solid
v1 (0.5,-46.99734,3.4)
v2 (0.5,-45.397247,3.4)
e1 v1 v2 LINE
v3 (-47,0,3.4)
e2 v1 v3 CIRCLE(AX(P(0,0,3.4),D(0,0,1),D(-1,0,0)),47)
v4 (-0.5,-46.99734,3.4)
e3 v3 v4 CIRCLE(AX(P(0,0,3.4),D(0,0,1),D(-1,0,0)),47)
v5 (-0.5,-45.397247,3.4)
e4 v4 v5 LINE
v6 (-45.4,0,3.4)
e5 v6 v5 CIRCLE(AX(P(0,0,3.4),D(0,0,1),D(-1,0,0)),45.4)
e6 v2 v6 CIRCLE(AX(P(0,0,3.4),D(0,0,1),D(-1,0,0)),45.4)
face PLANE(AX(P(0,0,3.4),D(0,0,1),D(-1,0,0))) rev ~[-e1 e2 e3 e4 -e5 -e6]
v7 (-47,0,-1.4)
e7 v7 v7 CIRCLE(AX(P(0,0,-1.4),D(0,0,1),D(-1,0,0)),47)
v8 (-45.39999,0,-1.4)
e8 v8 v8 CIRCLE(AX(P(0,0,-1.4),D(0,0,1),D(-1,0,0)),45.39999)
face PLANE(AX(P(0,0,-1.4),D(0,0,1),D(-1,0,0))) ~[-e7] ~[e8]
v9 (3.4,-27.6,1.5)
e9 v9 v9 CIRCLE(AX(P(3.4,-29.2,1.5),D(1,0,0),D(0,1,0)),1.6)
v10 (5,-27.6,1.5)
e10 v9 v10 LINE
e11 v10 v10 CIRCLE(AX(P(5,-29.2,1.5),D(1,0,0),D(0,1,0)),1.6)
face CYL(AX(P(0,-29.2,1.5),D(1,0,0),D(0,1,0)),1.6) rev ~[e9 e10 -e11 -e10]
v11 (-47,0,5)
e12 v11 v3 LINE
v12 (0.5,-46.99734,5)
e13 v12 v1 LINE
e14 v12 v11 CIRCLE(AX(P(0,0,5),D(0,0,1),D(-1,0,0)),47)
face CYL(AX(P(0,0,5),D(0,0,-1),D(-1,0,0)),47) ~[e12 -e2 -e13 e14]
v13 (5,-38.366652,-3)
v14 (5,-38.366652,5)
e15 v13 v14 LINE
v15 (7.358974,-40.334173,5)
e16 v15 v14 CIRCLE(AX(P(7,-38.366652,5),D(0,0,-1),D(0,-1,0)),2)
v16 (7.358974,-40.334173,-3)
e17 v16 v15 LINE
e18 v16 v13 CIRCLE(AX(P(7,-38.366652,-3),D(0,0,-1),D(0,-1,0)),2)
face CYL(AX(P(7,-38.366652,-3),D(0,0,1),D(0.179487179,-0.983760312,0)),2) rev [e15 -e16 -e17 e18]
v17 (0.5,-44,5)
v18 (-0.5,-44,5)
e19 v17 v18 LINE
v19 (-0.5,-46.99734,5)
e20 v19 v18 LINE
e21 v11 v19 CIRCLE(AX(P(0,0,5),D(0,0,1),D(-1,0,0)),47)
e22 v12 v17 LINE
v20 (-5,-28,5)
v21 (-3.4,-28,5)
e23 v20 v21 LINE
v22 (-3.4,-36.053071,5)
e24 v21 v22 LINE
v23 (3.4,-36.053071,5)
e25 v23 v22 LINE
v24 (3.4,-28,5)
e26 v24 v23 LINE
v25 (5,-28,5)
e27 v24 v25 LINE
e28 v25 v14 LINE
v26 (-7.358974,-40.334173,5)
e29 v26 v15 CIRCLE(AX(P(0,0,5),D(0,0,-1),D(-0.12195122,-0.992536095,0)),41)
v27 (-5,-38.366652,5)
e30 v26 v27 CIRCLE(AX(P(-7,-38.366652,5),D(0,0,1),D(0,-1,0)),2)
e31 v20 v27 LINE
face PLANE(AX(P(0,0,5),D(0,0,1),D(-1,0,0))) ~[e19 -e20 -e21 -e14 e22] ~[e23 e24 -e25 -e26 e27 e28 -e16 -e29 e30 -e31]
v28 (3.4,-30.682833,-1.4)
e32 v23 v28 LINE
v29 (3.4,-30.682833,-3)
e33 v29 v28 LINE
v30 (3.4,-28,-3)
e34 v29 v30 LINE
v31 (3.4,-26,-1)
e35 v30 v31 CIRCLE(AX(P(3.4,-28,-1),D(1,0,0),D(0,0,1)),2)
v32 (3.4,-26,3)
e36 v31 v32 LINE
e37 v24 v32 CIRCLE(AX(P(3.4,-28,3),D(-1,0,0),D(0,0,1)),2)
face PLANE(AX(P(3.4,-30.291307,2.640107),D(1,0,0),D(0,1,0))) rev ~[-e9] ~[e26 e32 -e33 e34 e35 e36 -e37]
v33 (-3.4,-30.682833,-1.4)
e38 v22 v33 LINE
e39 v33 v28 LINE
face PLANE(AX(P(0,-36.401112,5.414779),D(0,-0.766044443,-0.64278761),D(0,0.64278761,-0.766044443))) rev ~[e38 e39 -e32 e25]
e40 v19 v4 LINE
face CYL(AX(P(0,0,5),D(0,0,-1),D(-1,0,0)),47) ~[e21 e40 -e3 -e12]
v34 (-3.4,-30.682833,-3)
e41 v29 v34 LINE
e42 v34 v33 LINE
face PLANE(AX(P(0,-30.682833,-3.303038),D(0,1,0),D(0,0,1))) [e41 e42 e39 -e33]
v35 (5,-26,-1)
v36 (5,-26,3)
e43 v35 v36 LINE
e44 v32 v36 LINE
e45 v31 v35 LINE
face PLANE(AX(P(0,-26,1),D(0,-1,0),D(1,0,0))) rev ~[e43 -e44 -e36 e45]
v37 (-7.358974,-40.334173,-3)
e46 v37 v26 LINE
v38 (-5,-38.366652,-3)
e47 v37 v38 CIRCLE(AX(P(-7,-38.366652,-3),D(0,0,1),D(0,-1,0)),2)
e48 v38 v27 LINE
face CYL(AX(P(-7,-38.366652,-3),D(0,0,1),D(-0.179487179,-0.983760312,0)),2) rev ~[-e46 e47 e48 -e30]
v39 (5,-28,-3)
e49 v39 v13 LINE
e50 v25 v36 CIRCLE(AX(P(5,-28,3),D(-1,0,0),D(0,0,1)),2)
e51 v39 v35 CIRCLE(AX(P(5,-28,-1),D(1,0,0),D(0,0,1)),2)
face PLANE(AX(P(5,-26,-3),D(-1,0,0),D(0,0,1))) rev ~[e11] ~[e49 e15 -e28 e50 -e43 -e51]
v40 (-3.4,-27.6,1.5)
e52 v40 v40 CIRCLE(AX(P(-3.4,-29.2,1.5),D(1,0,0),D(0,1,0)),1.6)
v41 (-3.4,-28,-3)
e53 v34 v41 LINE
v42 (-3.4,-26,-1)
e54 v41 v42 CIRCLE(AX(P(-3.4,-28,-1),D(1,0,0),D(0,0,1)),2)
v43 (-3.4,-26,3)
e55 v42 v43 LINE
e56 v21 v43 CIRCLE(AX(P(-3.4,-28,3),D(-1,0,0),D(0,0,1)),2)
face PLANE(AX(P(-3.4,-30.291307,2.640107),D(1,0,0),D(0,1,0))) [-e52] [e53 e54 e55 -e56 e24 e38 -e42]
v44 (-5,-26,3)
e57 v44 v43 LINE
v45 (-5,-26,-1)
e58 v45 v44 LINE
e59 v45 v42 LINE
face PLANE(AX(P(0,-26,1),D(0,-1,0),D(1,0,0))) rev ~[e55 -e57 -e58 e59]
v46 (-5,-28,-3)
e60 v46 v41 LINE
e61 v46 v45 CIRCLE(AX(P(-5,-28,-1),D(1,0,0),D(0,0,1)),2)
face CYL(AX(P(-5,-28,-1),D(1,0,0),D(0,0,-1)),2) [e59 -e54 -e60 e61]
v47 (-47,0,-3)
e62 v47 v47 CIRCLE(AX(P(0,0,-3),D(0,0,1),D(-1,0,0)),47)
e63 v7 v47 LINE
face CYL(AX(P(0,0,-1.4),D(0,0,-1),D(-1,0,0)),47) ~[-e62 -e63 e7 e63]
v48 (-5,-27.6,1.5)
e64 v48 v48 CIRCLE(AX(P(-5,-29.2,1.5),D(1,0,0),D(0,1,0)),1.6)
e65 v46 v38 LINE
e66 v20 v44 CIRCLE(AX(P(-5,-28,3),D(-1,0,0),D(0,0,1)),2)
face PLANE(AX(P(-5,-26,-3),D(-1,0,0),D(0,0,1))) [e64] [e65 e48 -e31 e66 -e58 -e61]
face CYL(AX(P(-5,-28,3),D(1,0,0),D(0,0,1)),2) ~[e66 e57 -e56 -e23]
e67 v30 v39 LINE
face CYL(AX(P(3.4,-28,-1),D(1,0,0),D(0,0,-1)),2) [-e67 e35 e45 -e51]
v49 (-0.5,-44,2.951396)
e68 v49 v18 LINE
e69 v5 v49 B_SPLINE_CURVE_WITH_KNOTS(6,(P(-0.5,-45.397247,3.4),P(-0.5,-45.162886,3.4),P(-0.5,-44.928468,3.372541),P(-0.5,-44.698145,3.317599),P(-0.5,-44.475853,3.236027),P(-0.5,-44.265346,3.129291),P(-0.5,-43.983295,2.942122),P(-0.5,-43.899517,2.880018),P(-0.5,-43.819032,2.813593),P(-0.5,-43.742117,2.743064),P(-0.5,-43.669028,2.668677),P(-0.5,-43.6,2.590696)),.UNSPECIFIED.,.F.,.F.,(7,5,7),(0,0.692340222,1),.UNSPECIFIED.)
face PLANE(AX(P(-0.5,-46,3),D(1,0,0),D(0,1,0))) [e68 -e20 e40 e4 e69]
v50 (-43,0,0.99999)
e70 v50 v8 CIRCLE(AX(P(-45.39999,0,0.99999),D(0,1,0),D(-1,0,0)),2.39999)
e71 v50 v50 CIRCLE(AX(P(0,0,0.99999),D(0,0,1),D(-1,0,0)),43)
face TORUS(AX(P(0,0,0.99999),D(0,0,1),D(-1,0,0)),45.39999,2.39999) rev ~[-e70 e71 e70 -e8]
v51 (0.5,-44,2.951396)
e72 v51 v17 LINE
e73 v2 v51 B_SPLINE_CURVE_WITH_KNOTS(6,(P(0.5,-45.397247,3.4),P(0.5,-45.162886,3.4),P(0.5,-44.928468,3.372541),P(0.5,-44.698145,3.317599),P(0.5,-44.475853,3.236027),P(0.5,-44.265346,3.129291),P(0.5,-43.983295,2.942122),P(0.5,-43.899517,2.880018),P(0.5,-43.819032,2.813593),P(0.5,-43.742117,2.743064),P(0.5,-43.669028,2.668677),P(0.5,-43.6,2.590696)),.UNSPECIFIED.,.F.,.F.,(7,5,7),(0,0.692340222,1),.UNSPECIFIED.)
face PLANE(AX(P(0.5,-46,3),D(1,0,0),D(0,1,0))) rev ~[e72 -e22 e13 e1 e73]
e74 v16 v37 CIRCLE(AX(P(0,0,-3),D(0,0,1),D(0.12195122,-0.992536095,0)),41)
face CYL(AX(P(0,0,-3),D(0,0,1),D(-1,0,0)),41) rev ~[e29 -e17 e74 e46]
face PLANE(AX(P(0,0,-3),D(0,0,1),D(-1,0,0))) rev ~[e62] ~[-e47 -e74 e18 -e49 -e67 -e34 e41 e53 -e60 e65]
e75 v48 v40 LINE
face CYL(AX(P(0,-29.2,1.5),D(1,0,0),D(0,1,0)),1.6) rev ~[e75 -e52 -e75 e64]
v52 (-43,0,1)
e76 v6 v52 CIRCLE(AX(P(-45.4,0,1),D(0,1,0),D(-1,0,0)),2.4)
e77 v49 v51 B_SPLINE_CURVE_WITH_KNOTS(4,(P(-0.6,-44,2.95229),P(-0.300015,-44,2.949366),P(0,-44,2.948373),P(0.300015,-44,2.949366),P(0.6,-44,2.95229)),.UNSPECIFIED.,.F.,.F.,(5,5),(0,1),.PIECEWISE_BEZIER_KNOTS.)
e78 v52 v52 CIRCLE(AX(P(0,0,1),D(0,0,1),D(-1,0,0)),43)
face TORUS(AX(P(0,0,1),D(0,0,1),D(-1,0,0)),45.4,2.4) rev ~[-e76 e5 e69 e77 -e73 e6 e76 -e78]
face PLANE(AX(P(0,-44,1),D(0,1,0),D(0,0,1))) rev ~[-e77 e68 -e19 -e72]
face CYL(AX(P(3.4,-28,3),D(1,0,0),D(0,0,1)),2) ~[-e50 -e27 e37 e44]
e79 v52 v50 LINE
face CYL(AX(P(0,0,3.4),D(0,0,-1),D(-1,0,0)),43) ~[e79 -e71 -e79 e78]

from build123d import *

# Parameters (mm, degrees)
F2_R      = 2.4
F3_R      = 2.39999
F5_W      = 10
F5_H      = 8
F7_R      = 1.6
F8_DEPTH  = 5
F7_W      = 4.6828329376
F7_H      = 1.903038422
F9_DEPTH  = 3.4
F10_R     = 2
F11_W     = 4
F11_H     = 4
F12_DEPTH = 0.5


# Not quite as in the source:
# - a fillet or chamfer is up to 0.001 mm smaller than in the source, because OpenCascade refuses the exact size
# - a feature names something its author has since deleted; it is built from what else it names


with BuildPart() as f1:
    # F0 (on Front) → F1 (revolve)
    with BuildSketch(Plane.XZ):
        Polygon((-41, 5), (-47, 5), (-47, 3.4), (-43, 3.4), (-43, -1.4), (-47, -1.4), (-47, -3), (-41, -3), align=None)
    revolve(axis=Axis((0, 0, 0.7178727537), (0, 0, 1)))

    # F2
    f2_edges = [f1.edges().sort_by_distance(p)[0] for p in [
        (43, 0, 3.4),
    ]]
    fillet(f2_edges, radius=F2_R)

    # F3 (radius 2.4 in the source; OpenCascade refuses exactly that, so slightly less here)
    f3_edges = [f1.edges().sort_by_distance(p)[0] for p in [
        (43, 0, -1.4),
    ]]
    fillet(f3_edges, radius=F3_R)

    # F5 (on offset) → F6 (join, up to the next surface of F1)
    with BuildSketch(Plane.XZ.offset(26)):
        with Locations((0, 1)):
            Rectangle(F5_W, F5_H)
    extrude(until=Until.NEXT)

    # F7 (on Right) → F8 (cut, symmetric)
    with BuildSketch(Plane.YZ):
        with Locations((-29.2, 1.5)):
            Circle(F7_R)
    extrude(amount=F8_DEPTH, both=True, mode=Mode.SUBTRACT)

    # F7 (on Right) → F9 (cut, symmetric)
    with BuildSketch(Plane.YZ):
        Polygon((-26, 5.4147794951), (-36.4011118985, 5.4147794951), (-30.6828329376, -1.4), (-26, -1.4), (-26, 3.0355471618), align=None)
        with Locations((-29.2, 1.5)):
            Circle(F7_R, mode=Mode.SUBTRACT)
        with Locations((-28.3414164688, -2.351519211)):
            Rectangle(F7_W, F7_H)
    extrude(amount=F9_DEPTH, both=True, mode=Mode.SUBTRACT)

    # F10
    f10_edges = [f1.edges().sort_by_distance(p)[0] for p in [
        (-4.2, -26, 5),
        (4.2, -26, 5),
        (-4.2, -26, -3),
        (4.2, -26, -3),
        (-5, -40.69398, 1),
        (5, -40.69398, 1),
    ]]
    fillet(f10_edges, radius=F10_R)

    # F11 (on Right) → F12 (cut, symmetric)
    with BuildSketch(Plane.YZ):
        with Locations((-46, 3)):
            Rectangle(F11_W, F11_H)
    extrude(amount=F12_DEPTH, both=True, mode=Mode.SUBTRACT)


solid = f1.part
